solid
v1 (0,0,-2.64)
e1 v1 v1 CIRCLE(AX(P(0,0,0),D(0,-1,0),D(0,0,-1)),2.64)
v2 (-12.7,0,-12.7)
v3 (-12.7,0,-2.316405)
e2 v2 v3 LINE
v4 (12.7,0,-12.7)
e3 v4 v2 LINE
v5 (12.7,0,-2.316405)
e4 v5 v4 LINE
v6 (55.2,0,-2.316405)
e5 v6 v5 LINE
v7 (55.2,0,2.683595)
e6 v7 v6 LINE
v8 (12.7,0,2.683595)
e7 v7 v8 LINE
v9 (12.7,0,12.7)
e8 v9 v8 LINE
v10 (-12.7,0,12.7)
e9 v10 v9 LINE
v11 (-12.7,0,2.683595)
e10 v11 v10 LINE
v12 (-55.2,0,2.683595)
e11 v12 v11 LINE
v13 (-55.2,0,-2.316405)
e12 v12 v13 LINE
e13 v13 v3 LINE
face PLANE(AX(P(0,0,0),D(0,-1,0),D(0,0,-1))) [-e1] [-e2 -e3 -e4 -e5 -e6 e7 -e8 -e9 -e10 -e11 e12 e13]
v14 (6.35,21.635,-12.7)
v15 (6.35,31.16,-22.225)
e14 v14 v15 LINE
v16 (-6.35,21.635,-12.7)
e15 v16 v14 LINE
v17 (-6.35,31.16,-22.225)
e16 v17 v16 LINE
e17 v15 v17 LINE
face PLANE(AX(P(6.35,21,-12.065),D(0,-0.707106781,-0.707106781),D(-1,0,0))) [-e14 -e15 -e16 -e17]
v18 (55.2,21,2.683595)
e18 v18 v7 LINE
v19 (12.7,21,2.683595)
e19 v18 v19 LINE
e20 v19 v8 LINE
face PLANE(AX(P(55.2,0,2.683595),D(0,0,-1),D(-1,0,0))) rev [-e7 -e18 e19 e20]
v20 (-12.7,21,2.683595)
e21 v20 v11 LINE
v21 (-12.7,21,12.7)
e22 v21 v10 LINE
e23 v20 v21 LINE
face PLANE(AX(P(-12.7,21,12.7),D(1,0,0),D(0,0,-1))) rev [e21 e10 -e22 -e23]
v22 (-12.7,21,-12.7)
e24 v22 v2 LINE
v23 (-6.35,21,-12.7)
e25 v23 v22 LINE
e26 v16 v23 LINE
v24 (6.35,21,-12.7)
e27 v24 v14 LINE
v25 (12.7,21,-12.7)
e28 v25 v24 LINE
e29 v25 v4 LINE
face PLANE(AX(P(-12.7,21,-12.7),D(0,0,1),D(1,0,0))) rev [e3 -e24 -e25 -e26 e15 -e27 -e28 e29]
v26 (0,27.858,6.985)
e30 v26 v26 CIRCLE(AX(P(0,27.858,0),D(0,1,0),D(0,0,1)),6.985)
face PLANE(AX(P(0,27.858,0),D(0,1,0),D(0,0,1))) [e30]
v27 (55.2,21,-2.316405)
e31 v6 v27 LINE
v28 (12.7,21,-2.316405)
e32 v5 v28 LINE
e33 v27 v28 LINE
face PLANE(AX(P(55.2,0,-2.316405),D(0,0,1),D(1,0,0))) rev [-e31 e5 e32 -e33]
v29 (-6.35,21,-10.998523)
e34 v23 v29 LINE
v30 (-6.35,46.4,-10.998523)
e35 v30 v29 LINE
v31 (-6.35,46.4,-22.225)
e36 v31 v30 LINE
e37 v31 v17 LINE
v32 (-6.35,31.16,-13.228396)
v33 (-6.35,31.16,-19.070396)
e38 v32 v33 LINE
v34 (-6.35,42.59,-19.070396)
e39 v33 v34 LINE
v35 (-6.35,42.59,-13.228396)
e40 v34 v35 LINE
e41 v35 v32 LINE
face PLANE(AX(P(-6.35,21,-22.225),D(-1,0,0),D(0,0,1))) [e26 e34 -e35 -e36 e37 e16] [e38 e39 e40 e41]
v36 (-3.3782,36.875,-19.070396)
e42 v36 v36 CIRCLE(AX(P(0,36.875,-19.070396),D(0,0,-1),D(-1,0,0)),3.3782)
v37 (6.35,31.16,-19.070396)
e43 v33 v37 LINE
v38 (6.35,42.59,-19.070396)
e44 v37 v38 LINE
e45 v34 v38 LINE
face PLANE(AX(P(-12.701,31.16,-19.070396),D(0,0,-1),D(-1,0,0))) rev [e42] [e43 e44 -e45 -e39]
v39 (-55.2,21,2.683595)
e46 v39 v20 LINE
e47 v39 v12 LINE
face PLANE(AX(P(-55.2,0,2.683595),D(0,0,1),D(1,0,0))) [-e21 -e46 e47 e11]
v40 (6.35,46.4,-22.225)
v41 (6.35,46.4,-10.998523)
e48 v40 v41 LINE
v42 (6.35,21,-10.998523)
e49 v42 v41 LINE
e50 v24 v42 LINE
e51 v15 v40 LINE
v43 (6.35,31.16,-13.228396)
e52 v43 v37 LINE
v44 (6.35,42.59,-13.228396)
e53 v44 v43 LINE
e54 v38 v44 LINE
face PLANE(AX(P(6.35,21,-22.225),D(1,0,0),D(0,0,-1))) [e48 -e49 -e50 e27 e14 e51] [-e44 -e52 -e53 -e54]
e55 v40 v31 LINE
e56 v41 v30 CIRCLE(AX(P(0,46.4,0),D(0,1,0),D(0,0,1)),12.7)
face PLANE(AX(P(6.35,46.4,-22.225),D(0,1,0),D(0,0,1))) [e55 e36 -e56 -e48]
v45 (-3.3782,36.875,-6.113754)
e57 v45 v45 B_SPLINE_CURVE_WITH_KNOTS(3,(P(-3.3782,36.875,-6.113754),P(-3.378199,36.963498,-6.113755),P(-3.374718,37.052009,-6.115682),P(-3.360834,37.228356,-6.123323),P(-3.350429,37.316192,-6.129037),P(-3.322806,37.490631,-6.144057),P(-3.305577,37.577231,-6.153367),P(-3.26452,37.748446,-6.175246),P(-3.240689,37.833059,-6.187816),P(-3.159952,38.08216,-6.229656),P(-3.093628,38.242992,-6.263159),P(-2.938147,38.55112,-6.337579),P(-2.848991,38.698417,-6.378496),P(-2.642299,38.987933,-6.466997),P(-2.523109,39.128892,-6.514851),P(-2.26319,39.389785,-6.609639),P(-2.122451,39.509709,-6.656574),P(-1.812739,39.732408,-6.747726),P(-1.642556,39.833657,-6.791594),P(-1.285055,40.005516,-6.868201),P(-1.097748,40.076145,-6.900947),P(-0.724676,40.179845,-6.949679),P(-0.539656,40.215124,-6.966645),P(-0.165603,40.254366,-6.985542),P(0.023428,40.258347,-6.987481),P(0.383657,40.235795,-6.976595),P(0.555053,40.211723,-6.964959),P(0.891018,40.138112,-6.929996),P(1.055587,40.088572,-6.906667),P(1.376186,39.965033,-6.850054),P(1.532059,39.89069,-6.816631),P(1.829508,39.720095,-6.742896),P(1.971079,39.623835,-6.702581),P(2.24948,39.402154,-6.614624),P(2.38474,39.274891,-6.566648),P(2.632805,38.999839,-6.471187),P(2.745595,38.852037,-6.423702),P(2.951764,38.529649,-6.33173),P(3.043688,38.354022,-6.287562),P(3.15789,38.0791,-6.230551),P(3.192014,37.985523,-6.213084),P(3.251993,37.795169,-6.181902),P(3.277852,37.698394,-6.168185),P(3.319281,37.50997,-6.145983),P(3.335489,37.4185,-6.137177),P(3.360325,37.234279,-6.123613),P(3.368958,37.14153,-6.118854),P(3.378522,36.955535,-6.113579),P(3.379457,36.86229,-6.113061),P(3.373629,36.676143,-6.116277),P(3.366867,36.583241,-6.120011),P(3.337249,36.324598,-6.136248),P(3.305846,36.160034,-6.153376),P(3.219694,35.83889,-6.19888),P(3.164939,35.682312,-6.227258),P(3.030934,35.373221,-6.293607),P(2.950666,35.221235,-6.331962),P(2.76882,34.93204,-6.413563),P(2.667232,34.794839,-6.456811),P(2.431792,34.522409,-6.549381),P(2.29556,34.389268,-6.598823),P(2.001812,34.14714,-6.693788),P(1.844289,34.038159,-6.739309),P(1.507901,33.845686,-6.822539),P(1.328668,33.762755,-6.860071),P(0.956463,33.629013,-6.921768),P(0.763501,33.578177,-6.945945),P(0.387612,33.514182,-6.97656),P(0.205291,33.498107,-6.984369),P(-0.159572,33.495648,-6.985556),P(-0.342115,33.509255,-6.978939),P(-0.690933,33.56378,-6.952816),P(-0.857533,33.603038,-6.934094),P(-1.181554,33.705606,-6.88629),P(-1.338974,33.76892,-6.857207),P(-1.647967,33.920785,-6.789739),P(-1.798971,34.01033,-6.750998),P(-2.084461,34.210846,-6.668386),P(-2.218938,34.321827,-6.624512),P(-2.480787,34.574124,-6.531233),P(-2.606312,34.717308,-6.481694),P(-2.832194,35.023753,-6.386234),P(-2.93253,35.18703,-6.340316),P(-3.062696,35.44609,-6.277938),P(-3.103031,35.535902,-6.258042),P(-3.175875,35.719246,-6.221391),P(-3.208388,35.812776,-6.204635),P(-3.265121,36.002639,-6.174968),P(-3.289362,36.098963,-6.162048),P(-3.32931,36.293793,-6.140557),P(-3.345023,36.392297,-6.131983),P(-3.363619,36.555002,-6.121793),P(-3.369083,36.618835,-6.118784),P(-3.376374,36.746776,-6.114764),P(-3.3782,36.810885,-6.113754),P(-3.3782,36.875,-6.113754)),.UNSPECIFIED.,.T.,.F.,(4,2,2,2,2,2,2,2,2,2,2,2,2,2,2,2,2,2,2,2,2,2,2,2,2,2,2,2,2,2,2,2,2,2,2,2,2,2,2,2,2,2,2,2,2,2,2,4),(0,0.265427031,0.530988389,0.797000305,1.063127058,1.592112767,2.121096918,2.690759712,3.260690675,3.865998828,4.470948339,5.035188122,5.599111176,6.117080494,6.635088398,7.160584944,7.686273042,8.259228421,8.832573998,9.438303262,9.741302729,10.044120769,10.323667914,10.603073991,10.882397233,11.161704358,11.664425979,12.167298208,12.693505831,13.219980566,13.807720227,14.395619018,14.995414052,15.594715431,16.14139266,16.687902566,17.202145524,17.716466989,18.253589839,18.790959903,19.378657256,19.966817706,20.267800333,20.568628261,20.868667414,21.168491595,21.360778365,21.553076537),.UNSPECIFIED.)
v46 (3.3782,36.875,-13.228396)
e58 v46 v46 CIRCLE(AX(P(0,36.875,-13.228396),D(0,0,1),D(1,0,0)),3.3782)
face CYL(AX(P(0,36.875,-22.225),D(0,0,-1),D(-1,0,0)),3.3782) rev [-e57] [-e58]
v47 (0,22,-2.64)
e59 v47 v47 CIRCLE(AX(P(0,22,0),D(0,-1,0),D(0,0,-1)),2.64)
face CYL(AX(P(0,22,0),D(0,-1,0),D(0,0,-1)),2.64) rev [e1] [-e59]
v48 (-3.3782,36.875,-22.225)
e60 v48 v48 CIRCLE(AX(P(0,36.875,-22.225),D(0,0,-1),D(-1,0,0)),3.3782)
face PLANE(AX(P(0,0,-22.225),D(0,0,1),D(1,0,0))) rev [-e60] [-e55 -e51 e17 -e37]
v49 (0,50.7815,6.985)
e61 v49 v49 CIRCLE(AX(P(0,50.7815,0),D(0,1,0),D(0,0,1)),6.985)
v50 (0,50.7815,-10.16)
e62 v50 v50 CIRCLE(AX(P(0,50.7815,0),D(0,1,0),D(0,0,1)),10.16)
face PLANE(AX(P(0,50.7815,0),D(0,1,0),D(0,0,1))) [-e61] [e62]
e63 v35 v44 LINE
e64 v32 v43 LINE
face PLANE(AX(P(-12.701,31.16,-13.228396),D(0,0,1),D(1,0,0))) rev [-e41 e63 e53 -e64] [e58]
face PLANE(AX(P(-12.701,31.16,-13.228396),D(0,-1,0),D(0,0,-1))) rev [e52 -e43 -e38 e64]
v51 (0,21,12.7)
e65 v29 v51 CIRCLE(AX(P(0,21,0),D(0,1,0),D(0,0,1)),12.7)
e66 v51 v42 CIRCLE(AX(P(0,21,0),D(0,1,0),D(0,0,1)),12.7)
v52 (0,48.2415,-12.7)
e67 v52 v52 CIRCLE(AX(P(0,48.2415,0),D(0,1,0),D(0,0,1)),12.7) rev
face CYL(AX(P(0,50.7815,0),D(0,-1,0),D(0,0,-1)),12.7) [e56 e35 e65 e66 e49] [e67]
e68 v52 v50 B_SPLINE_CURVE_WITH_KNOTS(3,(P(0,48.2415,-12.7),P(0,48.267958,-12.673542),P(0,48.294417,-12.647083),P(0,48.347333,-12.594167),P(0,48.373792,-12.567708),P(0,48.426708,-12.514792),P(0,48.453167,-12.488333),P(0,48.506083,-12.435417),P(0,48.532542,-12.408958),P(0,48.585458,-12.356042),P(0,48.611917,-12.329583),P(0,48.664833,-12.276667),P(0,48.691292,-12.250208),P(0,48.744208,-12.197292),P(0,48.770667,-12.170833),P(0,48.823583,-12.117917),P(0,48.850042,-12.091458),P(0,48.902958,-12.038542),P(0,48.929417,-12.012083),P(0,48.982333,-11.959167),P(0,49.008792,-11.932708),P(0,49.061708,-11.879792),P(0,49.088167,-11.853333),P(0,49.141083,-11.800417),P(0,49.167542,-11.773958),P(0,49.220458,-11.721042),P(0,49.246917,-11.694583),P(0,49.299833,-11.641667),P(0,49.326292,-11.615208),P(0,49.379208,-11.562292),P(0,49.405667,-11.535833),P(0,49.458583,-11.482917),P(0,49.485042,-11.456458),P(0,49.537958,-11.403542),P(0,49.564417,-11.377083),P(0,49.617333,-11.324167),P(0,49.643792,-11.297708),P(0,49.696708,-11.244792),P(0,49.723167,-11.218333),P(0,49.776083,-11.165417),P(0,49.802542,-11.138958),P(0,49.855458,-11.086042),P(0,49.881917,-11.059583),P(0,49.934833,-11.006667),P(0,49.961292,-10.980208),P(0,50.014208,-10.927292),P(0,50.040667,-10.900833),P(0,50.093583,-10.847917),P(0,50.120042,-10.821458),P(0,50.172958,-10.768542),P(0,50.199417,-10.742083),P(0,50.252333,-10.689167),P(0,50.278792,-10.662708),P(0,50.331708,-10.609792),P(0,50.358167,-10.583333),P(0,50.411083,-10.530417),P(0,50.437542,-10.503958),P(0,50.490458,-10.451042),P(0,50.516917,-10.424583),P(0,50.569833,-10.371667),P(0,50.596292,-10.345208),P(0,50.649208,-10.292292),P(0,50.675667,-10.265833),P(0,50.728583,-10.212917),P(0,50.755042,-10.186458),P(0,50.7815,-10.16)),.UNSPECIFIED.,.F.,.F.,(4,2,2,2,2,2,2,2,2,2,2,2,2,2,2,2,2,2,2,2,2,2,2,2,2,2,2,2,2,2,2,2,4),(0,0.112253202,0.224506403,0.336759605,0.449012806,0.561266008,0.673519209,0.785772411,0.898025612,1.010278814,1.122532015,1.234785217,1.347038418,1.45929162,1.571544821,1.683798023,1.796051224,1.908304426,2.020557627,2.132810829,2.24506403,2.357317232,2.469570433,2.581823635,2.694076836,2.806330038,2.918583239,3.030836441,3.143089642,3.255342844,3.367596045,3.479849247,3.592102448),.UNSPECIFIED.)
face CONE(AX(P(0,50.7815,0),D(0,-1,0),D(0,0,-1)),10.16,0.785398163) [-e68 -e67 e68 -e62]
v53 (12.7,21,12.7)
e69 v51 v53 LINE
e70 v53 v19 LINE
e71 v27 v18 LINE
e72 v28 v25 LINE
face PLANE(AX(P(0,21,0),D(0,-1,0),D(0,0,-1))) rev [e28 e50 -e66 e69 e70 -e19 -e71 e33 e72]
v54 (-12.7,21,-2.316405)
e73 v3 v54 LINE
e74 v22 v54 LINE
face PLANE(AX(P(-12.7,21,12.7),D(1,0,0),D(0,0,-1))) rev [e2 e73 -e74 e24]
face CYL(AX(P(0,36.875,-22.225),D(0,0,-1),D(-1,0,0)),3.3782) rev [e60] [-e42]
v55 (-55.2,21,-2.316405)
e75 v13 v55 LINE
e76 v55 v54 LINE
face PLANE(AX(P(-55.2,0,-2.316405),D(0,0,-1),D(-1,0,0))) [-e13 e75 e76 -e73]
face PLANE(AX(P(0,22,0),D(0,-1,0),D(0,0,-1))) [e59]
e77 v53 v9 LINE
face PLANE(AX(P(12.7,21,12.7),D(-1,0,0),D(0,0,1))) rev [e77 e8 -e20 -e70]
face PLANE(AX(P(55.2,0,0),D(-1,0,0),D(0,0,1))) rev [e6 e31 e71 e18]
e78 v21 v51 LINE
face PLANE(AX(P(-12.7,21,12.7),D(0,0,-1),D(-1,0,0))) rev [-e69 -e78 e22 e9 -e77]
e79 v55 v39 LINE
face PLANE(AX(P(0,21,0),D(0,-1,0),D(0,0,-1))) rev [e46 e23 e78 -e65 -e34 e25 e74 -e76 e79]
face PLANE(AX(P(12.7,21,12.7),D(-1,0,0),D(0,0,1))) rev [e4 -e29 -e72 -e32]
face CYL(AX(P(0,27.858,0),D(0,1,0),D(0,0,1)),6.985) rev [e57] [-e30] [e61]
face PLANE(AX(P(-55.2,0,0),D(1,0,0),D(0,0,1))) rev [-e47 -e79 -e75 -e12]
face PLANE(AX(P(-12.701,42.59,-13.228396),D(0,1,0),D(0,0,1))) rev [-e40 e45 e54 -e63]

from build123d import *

# Parameters (mm, degrees)
SKETCH1_W                   = 25.4
SKETCH1_H                   = 25.4
BOSS_EXTRUDE1_DEPTH         = 21
SKETCH8_W                   = 2.902818519
SKETCH8_H                   = 9.580147983
BOSS_EXTRUDE4_DEPTH         = 25.4
SKETCH10_R                  = 12.7
BOSS_EXTRUDE5_DEPTH         = 29.7815
SKETCH12_R                  = 6.985
CUT_EXTRUDE2_DEPTH          = 22.9235
CHAMFER1_SIZE               = 2.54
SKETCH14_W                  = 12.7
SKETCH14_H                  = 25.4
BOSS_EXTRUDE6_DEPTH         = 15.24
CUT_EXTRUDE3_REACH          = 60.614
SKETCH18_W                  = 5.842
SKETCH18_H                  = 11.43
F_1_4_CLEARANCE_HOLE2_D     = 6.7564
F_1_4_CLEARANCE_HOLE2_DEPTH = 20.32
F_1_4_CLEARANCE_HOLE2_TIP   = 2.029827343
CHAMFER2_SIZE               = 10.16
SKETCH21_W                  = 5
SKETCH21_H                  = 21
BOSS_EXTRUDE7_DEPTH         = 42.5
SKETCH22_R                  = 2.64
CUT_EXTRUDE4_DEPTH          = 22


with BuildPart() as part:
    # Sketch1 → Boss-Extrude1 (new body)
    with BuildSketch(Plane(origin=(0, 0, 0), x_dir=(1, 0, 0), z_dir=(0, 1, 0))):
        Rectangle(SKETCH1_W, SKETCH1_H)
    extrude(amount=BOSS_EXTRUDE1_DEPTH)

    # Sketch8 → Boss-Extrude4 (add, through all)
    with BuildSketch(Plane.XY.offset(12.7)):
        with Locations((-1.45140926, 4.790073991)):
            Rectangle(SKETCH8_W, SKETCH8_H)
    extrude(amount=-BOSS_EXTRUDE4_DEPTH)

    # Sketch10 → Boss-Extrude5 (add)
    with BuildSketch(Plane(origin=(0, 21, 0), x_dir=(1, 0, 0), z_dir=(0, 1, 0))):
        with Locations(Location((0, 0, 0), (0, 0, 270))):
            Circle(SKETCH10_R)
    extrude(amount=BOSS_EXTRUDE5_DEPTH)

    # Sketch12 → Cut-Extrude2 (cut)
    with BuildSketch(Plane(origin=(0, 50.7815, 0), x_dir=(1, 0, 0), z_dir=(0, 1, 0))):
        with Locations(Location((0, 0, 0), (0, 0, 270))):
            Circle(SKETCH12_R)
    extrude(amount=-CUT_EXTRUDE2_DEPTH, mode=Mode.SUBTRACT)

    # Chamfer1
    chamfer1_edges = [part.edges().sort_by_distance(p)[0] for p in [
        (0, 50.7815, -12.7),
    ]]
    chamfer(chamfer1_edges, length=CHAMFER1_SIZE)

    # Sketch14 → Boss-Extrude6 (add)
    with BuildSketch(Plane.XY.offset(-6.985)):
        with Locations((0, 33.7)):
            Rectangle(SKETCH14_W, SKETCH14_H)
    extrude(amount=-BOSS_EXTRUDE6_DEPTH)

    # Sketch18 → Cut-Extrude3 (cut, up to next)
    with BuildSketch(Plane(origin=(6.35, 0, 0), x_dir=(0, 0, -1), z_dir=(1, 0, 0)), mode=Mode.PRIVATE) as cut_extrude3_sk1:
        with Locations((16.149395763, 36.875)):
            Rectangle(SKETCH18_W, SKETCH18_H)
    cut_extrude3_tool1 = extrude(cut_extrude3_sk1.sketch, amount=-CUT_EXTRUDE3_REACH, mode=Mode.PRIVATE) & part.part
    add(cut_extrude3_tool1.solids().sort_by_distance((6.35, 36.875, -16.149396))[0], mode=Mode.SUBTRACT)

    # 1/4 Clearance Hole2
    with Locations(Plane(origin=(0, 0, -22.225), x_dir=(-1, 0, 0), z_dir=(0, 0, -1))):
        with Locations((0, 36.875)):
            Hole(F_1_4_CLEARANCE_HOLE2_D / 2, depth=F_1_4_CLEARANCE_HOLE2_DEPTH)
            with Locations((0, 0, -(F_1_4_CLEARANCE_HOLE2_DEPTH + F_1_4_CLEARANCE_HOLE2_TIP / 2))):  # 118° drill point
                Cone(0, F_1_4_CLEARANCE_HOLE2_D / 2, F_1_4_CLEARANCE_HOLE2_TIP, mode=Mode.SUBTRACT)

    # Chamfer2
    # the kernel refuses this chamfer: 10.16 mm, written as the material it takes off along each edge
    with BuildSketch(Plane(origin=(32.478299158, 21, -22.225), x_dir=(0, 0.9996219169112968, -0.027495876610586268), z_dir=(-1, 0, 0))) as chamfer2_piece_1_section:
        Polygon((CHAMFER2_SIZE * 0.999621916911, -CHAMFER2_SIZE * 0.0274958766106), (-CHAMFER2_SIZE * 0.0274958766106, -CHAMFER2_SIZE * 0.999621916911), (0, 0), align=None)
    chamfer2_piece_1 = extrude(amount=64.956598315, mode=Mode.PRIVATE)
    chamfer2_piece_1 = split(chamfer2_piece_1, bisect_by=Plane(origin=(0, 24.386079735, -12.7), z_dir=(0, 0, -1)), keep=Keep.TOP, mode=Mode.PRIVATE)
    add(chamfer2_piece_1, mode=Mode.SUBTRACT)

    # Sketch21 → Boss-Extrude7 (add)
    with BuildSketch(Plane(origin=(12.7, 0, 0), x_dir=(0, 0, -1), z_dir=(1, 0, 0))):
        with Locations((-0.183594793, 10.5)):
            Rectangle(SKETCH21_W, SKETCH21_H)
    boss_extrude7 = extrude(amount=BOSS_EXTRUDE7_DEPTH)

    # Sketch22 → Cut-Extrude4 (cut)
    with BuildSketch(Plane(origin=(0, 0, 0), x_dir=(-1, 0, 0), z_dir=(0, -1, 0))):
        with Locations(Location((0, 0, 0), (0, 0, 90))):
            Circle(SKETCH22_R)
    extrude(amount=-CUT_EXTRUDE4_DEPTH, mode=Mode.SUBTRACT)

    # Mirror1: Boss-Extrude7 across plane
    add(boss_extrude7.mirror(Plane(origin=(0, 0, 0), x_dir=(0, 0, 1), z_dir=(1, 0, 0))))


solid = part.part
